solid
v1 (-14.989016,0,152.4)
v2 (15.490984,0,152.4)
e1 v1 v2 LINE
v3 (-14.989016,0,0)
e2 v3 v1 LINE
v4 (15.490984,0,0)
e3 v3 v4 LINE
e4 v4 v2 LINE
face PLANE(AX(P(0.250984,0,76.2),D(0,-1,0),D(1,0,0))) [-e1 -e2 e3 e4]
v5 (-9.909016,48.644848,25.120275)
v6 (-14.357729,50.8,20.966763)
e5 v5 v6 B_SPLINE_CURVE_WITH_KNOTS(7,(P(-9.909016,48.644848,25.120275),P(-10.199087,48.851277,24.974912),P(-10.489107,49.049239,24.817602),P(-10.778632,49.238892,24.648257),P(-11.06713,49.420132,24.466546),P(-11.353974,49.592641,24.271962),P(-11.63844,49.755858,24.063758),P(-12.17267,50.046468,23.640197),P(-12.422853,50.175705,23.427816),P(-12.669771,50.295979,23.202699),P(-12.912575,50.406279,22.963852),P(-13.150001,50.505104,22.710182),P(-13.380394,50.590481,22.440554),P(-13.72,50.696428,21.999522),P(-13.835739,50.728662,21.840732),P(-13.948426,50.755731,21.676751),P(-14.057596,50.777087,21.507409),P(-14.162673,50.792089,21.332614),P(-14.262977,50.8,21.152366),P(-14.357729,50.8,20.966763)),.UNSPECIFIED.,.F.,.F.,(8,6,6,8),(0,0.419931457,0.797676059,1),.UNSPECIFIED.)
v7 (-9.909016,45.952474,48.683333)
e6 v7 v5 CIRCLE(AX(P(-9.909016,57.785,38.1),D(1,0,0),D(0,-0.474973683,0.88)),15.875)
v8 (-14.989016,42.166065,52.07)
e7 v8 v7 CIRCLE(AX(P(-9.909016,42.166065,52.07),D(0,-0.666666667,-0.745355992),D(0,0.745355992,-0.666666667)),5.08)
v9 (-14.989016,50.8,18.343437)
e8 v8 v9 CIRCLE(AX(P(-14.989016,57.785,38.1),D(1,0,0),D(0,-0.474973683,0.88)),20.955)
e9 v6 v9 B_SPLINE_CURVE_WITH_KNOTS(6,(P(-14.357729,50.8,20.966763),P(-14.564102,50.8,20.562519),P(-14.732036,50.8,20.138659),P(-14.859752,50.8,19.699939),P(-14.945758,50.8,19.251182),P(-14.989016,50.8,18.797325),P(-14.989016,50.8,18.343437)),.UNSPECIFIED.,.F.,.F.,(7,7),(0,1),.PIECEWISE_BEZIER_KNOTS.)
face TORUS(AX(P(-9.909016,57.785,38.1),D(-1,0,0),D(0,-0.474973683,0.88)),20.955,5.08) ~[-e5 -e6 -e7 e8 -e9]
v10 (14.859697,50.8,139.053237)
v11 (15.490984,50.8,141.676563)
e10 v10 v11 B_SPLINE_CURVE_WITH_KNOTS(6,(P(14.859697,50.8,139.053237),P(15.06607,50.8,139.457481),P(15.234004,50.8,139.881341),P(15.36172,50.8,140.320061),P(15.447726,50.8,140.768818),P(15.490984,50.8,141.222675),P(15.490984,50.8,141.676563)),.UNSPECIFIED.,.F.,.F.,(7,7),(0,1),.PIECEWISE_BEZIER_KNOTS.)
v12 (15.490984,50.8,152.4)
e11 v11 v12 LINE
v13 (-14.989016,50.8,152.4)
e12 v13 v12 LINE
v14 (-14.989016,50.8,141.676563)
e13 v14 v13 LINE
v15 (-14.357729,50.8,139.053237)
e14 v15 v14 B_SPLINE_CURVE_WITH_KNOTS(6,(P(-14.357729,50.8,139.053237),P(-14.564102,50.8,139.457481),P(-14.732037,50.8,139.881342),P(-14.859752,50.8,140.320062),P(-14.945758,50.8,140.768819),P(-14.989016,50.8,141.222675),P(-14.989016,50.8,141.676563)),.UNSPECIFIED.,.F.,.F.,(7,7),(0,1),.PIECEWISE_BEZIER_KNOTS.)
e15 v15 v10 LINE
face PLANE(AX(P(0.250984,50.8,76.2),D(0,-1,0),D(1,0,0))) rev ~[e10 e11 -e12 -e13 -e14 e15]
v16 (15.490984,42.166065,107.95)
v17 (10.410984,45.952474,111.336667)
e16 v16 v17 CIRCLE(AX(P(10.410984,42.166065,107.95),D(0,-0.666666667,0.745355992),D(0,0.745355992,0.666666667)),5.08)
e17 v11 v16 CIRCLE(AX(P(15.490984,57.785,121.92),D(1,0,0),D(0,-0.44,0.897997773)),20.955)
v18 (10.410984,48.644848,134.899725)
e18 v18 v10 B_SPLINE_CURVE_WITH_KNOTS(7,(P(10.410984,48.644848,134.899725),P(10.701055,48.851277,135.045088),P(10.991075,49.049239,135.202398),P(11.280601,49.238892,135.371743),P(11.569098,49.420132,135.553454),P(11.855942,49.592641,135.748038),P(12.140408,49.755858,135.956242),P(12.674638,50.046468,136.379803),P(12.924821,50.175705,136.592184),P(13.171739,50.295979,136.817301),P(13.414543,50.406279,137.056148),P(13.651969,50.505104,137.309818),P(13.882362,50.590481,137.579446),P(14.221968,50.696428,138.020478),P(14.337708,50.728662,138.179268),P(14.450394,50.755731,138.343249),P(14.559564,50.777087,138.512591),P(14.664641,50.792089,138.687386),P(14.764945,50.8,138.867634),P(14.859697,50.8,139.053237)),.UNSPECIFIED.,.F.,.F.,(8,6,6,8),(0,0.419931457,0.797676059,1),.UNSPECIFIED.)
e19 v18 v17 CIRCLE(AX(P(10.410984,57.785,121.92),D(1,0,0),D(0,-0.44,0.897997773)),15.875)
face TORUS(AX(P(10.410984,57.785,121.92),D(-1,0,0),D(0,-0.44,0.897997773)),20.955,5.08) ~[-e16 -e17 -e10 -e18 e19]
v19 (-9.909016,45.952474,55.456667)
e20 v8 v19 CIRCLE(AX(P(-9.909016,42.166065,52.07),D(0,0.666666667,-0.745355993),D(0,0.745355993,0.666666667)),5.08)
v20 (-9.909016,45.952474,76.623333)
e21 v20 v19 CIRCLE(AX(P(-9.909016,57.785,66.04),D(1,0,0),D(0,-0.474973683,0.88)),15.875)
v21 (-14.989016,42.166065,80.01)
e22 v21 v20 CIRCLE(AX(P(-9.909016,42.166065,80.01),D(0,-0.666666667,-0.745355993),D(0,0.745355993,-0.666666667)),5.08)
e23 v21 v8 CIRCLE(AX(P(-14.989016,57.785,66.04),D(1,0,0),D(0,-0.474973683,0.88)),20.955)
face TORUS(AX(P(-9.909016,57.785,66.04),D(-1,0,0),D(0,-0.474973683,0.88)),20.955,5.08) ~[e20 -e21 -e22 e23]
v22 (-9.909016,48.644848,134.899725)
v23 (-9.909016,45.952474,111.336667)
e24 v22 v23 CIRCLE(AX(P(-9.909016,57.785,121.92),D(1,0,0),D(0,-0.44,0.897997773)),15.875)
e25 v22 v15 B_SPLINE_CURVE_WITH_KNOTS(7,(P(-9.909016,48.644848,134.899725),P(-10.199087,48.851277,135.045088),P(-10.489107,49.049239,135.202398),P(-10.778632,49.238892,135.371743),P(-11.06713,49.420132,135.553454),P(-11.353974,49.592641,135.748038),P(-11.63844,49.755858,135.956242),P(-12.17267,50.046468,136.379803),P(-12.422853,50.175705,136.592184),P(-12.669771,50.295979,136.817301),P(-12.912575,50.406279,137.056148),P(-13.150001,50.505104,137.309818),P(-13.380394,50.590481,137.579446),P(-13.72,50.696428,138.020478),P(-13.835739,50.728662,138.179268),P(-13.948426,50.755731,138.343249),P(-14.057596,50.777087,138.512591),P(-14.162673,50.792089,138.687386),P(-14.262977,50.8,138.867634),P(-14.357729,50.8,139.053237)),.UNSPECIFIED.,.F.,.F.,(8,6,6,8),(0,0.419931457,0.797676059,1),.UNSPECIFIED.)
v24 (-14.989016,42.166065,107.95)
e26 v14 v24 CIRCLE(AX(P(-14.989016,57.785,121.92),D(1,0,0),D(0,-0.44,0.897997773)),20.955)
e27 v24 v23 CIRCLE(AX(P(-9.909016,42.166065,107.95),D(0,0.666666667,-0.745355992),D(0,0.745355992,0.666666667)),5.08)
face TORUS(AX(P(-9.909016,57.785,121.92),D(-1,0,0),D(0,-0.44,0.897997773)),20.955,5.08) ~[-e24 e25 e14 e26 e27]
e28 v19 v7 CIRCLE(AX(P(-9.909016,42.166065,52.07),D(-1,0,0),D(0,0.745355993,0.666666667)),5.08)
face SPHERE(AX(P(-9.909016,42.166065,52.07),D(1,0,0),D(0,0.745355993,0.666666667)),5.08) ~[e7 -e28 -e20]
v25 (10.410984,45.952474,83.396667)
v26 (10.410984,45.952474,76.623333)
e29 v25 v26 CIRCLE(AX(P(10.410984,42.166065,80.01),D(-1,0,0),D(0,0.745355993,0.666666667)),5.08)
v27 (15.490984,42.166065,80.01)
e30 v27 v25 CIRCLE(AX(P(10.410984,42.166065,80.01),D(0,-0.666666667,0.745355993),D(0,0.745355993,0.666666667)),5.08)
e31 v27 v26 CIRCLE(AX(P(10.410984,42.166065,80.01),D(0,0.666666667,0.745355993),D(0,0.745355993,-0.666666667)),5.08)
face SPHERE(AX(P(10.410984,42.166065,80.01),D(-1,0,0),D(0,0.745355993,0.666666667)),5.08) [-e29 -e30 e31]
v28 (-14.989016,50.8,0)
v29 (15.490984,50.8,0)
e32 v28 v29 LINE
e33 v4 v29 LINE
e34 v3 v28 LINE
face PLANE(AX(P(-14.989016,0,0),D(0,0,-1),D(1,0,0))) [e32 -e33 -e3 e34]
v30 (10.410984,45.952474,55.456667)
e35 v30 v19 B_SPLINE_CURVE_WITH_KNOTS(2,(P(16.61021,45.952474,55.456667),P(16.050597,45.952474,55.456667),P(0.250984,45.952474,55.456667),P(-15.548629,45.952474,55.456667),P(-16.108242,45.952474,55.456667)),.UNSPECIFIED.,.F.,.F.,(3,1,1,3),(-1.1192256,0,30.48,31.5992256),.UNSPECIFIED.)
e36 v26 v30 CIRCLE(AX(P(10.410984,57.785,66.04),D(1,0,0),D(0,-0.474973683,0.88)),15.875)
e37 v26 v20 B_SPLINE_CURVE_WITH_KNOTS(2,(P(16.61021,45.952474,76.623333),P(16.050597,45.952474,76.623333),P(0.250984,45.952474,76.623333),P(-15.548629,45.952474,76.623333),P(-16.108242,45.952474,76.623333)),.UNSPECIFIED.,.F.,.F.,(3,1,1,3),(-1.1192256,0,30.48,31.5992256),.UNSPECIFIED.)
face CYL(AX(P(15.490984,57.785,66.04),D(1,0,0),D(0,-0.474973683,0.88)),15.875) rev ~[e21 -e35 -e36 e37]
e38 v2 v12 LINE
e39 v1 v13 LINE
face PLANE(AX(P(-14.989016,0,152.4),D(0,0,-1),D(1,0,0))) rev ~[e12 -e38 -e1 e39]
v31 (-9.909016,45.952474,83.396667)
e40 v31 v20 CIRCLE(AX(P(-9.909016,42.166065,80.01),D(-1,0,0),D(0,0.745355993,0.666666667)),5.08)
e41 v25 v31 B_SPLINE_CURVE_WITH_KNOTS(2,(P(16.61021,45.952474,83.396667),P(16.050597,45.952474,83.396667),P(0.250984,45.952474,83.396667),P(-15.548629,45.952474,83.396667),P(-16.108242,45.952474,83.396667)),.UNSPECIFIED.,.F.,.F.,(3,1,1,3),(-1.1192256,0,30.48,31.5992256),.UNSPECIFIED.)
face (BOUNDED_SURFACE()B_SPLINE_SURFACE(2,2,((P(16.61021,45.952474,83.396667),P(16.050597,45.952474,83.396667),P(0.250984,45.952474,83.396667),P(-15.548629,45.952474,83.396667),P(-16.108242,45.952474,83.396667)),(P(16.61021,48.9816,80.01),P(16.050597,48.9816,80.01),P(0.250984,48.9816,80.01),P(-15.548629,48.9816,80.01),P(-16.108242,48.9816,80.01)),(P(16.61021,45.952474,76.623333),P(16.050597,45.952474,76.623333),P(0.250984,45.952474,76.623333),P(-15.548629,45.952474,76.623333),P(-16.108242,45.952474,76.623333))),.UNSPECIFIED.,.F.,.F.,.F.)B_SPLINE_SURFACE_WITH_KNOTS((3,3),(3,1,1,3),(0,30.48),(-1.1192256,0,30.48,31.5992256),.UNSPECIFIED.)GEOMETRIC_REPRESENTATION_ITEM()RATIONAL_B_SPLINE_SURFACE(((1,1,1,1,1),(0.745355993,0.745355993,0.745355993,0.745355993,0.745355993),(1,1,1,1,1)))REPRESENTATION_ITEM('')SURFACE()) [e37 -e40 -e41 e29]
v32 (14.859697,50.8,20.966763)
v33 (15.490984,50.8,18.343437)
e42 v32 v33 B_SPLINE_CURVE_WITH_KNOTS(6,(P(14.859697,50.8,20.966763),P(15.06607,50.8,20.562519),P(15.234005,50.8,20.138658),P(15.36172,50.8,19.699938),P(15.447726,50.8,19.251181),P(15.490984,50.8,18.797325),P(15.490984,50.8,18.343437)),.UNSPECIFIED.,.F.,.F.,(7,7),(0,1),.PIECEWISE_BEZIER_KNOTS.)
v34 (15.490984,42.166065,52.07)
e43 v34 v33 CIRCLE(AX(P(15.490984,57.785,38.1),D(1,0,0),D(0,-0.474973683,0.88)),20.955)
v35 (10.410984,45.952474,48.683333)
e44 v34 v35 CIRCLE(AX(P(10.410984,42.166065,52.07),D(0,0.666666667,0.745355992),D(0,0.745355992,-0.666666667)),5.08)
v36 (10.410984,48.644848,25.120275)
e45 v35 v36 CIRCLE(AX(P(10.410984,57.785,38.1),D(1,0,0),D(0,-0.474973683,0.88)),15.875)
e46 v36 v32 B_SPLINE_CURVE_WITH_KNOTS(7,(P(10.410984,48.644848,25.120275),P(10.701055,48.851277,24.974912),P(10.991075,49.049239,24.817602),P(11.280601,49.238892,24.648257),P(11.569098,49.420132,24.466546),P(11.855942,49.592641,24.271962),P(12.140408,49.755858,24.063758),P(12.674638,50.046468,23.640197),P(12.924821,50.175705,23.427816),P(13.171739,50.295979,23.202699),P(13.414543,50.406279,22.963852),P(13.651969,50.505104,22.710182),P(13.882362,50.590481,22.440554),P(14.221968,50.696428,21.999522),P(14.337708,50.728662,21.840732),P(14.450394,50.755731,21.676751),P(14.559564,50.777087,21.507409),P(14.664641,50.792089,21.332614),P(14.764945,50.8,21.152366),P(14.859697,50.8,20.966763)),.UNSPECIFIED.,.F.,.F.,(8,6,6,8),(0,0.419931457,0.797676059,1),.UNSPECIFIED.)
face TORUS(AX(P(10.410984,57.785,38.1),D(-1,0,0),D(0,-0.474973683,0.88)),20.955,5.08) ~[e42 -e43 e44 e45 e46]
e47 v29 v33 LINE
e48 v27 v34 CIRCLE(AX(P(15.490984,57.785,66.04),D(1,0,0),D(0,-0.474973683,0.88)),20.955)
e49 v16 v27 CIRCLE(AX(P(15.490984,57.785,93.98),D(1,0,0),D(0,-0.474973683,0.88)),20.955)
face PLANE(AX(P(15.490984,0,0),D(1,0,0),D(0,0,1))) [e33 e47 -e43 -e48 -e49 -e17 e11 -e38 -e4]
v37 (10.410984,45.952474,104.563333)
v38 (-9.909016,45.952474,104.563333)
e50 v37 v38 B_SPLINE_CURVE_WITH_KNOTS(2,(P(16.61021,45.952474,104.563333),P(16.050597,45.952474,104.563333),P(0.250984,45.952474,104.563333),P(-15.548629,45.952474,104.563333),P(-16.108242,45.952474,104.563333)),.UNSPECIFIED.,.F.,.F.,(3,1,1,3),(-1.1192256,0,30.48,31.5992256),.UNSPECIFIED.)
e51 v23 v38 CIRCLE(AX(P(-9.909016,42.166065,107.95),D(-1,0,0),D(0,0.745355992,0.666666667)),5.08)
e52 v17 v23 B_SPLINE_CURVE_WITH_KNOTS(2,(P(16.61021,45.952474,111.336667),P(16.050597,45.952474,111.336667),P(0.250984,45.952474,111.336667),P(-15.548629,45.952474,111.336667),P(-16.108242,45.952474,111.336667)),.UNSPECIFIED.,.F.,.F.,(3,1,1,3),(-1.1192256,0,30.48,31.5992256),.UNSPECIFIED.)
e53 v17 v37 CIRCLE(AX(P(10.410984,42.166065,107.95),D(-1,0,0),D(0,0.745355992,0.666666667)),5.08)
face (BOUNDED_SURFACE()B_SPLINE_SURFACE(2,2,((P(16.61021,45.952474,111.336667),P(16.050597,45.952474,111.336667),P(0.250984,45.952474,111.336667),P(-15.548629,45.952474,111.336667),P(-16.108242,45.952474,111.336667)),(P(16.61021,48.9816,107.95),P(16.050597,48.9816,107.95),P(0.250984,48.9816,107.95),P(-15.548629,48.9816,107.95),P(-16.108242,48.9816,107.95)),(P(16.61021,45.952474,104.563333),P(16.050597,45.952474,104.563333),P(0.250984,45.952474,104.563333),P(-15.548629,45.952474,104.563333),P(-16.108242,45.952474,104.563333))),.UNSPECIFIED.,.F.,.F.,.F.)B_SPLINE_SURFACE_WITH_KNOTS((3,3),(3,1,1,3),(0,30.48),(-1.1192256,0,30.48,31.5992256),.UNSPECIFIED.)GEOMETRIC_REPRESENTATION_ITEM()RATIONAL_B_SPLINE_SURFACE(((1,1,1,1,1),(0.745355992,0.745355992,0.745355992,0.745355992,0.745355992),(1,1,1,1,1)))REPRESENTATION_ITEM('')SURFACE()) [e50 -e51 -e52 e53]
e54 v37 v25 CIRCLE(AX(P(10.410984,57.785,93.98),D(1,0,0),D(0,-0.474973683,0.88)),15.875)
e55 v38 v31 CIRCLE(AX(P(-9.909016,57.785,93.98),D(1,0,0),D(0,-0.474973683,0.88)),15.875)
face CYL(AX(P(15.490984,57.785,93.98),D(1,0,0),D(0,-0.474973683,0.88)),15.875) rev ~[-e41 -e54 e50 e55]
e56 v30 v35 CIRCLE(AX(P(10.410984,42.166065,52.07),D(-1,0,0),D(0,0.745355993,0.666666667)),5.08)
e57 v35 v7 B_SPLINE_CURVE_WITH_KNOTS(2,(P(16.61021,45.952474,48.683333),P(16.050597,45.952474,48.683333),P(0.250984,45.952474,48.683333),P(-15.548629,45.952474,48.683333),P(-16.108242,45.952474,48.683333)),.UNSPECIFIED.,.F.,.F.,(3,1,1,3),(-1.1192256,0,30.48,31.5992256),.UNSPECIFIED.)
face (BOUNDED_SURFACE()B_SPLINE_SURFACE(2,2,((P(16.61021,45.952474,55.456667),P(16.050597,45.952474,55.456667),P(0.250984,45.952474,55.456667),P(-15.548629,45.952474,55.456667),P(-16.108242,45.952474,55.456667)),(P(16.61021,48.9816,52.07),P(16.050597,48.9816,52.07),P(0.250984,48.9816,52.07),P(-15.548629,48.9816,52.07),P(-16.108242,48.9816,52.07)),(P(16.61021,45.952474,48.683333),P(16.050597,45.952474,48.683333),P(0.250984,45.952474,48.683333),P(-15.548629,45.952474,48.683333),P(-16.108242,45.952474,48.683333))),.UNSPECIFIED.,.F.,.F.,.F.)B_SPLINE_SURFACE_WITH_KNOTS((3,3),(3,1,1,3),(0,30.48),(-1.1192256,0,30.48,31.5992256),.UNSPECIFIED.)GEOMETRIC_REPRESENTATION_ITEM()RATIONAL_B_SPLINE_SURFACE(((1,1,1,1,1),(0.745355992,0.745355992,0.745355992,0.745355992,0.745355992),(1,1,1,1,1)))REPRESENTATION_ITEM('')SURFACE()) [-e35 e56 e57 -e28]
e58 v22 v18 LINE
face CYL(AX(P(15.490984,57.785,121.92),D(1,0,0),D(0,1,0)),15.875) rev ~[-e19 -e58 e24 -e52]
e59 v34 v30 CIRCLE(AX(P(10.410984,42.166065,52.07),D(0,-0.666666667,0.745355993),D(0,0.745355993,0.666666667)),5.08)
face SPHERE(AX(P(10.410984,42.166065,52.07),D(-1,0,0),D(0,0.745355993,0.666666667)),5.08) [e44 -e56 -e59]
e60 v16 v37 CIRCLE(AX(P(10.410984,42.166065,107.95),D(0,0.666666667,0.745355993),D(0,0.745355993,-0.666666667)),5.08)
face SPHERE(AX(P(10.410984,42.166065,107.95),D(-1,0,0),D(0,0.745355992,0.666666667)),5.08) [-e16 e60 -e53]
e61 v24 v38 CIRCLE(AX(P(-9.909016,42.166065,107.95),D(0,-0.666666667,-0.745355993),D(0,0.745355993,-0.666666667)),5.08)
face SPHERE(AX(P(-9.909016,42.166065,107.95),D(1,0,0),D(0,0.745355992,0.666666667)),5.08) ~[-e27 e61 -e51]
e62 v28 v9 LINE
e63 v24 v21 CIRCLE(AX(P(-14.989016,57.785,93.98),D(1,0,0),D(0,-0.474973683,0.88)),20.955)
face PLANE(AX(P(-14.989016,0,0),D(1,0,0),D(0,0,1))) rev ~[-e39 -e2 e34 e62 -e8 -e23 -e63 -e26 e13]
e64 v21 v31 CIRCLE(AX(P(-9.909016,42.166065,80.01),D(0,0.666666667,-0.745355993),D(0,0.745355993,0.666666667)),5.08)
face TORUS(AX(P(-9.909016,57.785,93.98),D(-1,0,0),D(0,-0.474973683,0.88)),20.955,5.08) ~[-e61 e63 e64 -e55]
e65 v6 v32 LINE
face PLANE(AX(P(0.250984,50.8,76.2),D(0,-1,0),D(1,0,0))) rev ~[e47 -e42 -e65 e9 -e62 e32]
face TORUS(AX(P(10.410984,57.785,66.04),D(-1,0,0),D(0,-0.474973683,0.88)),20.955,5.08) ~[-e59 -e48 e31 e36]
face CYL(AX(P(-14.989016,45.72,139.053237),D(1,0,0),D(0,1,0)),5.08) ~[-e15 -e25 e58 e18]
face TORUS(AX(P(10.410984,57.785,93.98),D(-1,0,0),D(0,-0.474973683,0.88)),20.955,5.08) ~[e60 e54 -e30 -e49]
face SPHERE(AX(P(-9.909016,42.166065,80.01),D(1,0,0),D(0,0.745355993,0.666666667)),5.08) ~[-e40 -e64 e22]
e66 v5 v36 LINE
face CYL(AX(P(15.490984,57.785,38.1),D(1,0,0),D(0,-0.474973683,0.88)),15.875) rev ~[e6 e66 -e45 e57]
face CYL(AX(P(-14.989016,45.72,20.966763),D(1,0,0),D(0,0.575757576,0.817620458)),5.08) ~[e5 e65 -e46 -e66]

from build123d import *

# Parameters (mm, degrees)
F0_W     = 30.48
F0_H     = 152.4
F1_DEPTH = 50.8
F3_DEPTH = 30.481
F4_R     = 5.08


with BuildPart() as f1:
    # F0 (on Front) → F1 (new body)
    with BuildSketch(Plane.XZ):
        with Locations((0.2509840885, 76.2)):
            Rectangle(F0_W, F0_H)
    extrude(amount=-F1_DEPTH)

    # F2 (on face) → F3 (cut, through all)
    with BuildSketch(Plane.YZ.offset(15.4909840885)):
        with BuildLine():
            ThreePointArc((65.3252072253, 107.95), (71.4179823352, 113.7862789789), (73.66, 121.92))
            ThreePointArc((73.66, 121.92), (49.6512789789, 135.5529823352), (50.2447927747, 107.95))
            ThreePointArc((50.2447927747, 107.95), (57.785, 109.855), (65.3252072253, 107.95))
        make_face()
        with BuildLine():
            ThreePointArc((65.3252072253, 107.95), (57.785, 109.855), (50.2447927747, 107.95))
            ThreePointArc((50.2447927747, 107.95), (57.785, 106.045), (65.3252072253, 107.95))
        make_face()
        with BuildLine():
            ThreePointArc((65.3252072253, 107.95), (57.785, 106.045), (50.2447927747, 107.95))
            ThreePointArc((50.2447927747, 107.95), (41.91, 93.98), (50.2447927747, 80.01))
            ThreePointArc((50.2447927747, 80.01), (57.785, 81.915), (65.3252072253, 80.01))
            ThreePointArc((65.3252072253, 80.01), (71.4179823352, 85.8462789789), (73.66, 93.98))
            ThreePointArc((73.66, 93.98), (71.4179823352, 102.1137210211), (65.3252072253, 107.95))
        make_face()
        with BuildLine():
            ThreePointArc((65.3252072253, 80.01), (57.785, 81.915), (50.2447927747, 80.01))
            ThreePointArc((50.2447927747, 80.01), (57.785, 78.105), (65.3252072253, 80.01))
        make_face()
        with BuildLine():
            ThreePointArc((65.3252072253, 80.01), (57.785, 78.105), (50.2447927747, 80.01))
            ThreePointArc((50.2447927747, 80.01), (41.91, 66.04), (50.2447927747, 52.07))
            ThreePointArc((50.2447927747, 52.07), (57.785, 53.975), (65.3252072253, 52.07))
            ThreePointArc((65.3252072253, 52.07), (71.4179823352, 57.9062789789), (73.66, 66.04))
            ThreePointArc((73.66, 66.04), (71.4179823352, 74.1737210211), (65.3252072253, 80.01))
        make_face()
        with BuildLine():
            ThreePointArc((65.3252072253, 52.07), (57.785, 53.975), (50.2447927747, 52.07))
            ThreePointArc((50.2447927747, 52.07), (57.785, 50.165), (65.3252072253, 52.07))
        make_face()
        with BuildLine():
            ThreePointArc((65.3252072253, 52.07), (57.785, 50.165), (50.2447927747, 52.07))
            ThreePointArc((50.2447927747, 52.07), (49.6512789789, 24.4670176648), (73.66, 38.1))
            ThreePointArc((73.66, 38.1), (71.4179823352, 46.2337210211), (65.3252072253, 52.07))
        make_face()
    extrude(amount=-F3_DEPTH, mode=Mode.SUBTRACT)

    # F4
    f4_edges = [f1.edges().sort_by_distance(p)[0] for p in [
        (15.490984, 41.91307, 122.232205),
        (15.490984, 41.91307, 37.787795),
        (-14.989016, 41.91307, 122.232205),
        (-14.989016, 41.91, 93.98),
        (-14.989016, 41.91, 66.04),
        (-14.989016, 41.91307, 37.787795),
        (0.250984, 50.8, 23.844285),
        (0.250984, 50.8, 136.175715),
        (0.250984, 50.244793, 52.07),
        (15.490984, 41.91, 66.04),
        (0.250984, 50.244793, 80.01),
        (15.490984, 41.91, 93.98),
        (0.250984, 50.244793, 107.95),
    ]]
    fillet(f4_edges, radius=F4_R)


solid = f1.part
